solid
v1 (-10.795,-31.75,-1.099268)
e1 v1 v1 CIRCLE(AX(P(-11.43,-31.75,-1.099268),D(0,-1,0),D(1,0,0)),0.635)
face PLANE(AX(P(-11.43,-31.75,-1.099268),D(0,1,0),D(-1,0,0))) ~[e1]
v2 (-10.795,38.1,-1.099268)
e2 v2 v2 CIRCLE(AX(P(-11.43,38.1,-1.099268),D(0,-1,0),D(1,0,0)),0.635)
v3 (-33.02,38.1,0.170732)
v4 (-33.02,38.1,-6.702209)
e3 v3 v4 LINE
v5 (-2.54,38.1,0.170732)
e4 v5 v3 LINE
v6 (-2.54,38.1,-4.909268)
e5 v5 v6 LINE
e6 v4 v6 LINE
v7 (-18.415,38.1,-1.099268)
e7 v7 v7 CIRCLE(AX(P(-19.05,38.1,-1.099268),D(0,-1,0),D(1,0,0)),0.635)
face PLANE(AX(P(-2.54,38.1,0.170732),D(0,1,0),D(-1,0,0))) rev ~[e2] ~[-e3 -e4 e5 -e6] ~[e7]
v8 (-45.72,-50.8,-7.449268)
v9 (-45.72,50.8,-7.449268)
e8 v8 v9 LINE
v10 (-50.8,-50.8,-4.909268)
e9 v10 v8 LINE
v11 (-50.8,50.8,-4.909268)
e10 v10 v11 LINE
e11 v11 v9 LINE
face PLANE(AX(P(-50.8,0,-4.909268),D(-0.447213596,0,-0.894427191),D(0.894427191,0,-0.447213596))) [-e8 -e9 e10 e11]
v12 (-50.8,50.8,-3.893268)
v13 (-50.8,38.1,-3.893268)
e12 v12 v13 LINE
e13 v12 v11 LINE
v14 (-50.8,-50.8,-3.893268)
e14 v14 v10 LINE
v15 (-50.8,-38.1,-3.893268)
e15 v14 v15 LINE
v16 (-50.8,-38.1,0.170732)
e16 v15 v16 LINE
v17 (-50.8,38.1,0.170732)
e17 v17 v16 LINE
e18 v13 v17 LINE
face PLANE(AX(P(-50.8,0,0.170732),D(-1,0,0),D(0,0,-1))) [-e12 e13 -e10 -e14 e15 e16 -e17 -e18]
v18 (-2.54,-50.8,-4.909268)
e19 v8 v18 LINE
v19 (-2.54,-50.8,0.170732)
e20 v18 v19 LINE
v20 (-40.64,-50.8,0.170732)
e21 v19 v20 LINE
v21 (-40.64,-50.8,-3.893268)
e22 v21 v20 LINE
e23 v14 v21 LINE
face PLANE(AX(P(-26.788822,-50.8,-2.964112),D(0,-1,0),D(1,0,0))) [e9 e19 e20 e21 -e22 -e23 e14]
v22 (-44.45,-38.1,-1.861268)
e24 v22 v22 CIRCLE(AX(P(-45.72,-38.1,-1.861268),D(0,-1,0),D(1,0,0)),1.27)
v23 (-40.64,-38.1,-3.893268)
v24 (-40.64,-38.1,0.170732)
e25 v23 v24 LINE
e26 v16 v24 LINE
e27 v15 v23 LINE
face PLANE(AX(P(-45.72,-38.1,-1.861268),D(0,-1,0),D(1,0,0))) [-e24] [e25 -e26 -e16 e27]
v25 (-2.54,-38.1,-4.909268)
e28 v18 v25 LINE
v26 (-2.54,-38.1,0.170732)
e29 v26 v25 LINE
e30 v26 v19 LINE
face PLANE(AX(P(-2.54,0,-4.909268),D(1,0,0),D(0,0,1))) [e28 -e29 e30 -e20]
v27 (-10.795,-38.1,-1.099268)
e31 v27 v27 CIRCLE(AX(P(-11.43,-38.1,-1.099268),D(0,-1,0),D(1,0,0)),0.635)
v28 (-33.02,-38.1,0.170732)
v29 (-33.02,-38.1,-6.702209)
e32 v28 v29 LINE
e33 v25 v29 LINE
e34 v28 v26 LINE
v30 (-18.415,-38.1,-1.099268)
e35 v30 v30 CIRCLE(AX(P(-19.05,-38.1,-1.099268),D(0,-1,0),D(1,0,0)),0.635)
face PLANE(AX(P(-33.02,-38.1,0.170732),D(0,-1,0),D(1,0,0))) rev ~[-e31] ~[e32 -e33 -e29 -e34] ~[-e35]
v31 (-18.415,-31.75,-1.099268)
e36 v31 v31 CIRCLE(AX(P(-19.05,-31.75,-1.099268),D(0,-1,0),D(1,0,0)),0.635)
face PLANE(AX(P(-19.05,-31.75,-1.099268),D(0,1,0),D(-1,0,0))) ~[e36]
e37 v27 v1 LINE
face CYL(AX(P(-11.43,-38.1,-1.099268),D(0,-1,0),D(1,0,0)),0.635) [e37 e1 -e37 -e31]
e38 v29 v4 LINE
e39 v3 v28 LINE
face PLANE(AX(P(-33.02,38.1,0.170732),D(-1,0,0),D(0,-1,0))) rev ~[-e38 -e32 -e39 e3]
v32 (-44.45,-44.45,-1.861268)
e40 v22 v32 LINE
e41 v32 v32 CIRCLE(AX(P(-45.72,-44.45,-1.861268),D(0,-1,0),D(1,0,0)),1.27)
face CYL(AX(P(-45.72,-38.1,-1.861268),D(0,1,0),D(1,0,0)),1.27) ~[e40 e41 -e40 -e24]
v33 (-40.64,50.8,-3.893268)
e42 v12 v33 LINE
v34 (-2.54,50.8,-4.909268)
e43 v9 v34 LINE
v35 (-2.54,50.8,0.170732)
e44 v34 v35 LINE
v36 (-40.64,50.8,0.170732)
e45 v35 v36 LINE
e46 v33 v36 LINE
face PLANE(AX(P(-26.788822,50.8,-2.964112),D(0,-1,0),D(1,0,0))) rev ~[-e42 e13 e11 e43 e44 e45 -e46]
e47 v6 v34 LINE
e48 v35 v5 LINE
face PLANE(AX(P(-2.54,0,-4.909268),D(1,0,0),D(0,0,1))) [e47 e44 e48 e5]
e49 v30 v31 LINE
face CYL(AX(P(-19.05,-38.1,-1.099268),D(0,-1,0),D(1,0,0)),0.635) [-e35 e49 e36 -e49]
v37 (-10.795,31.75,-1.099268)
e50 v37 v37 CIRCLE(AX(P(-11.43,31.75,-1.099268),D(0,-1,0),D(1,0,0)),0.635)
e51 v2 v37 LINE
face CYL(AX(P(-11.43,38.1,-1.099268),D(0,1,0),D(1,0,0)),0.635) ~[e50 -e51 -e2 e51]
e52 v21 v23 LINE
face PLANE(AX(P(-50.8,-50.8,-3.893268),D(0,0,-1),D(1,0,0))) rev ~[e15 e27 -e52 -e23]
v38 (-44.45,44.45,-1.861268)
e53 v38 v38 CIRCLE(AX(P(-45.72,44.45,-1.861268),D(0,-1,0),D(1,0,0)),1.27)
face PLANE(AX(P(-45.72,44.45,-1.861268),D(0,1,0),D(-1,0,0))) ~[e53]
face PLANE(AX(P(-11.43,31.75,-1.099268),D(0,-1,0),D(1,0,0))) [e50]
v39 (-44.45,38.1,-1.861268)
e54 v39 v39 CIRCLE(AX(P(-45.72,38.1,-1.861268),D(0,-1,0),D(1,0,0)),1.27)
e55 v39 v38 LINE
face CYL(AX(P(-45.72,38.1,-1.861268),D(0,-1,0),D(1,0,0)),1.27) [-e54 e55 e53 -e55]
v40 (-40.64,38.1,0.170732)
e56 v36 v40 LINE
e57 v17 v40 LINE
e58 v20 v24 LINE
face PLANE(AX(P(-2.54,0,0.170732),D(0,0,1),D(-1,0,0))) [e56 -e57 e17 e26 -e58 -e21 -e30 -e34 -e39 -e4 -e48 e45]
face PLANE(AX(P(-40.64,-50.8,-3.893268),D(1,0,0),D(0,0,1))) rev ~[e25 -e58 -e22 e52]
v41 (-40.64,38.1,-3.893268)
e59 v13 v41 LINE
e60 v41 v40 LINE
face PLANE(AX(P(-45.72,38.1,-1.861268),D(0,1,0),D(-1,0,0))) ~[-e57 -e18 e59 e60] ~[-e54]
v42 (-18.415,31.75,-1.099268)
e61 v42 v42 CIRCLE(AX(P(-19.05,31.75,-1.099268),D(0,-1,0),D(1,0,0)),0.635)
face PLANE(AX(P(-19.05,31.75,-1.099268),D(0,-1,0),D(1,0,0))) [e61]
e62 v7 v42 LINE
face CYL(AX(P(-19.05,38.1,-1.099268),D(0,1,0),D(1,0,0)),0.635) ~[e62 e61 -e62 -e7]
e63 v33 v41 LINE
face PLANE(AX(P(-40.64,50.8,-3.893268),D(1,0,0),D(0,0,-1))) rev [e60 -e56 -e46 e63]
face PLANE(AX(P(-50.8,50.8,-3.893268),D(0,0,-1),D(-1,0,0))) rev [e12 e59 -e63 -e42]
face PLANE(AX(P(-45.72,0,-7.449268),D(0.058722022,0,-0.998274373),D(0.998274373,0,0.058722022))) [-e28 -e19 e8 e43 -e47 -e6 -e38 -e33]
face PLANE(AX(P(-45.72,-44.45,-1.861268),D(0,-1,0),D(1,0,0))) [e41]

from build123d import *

# Parameters (mm, degrees)
F1_DEPTH = 50.8
F3_DEPTH = 7.621
F4_W     = 10.16
F4_H     = 4.064
F5_DEPTH = 12.7
F6_R     = 1.27
F7_DEPTH = 6.35
F8_R     = 0.635
F9_DEPTH = 6.35


# Not quite as in the source:
# - a pattern or mirror of a feature is missing from the dataset's text; its kind, count and spacing are read off the source's solid


with BuildPart() as f1:
    # F0 (on Front) → F1 (new body, symmetric)
    with BuildSketch(Plane.XZ):
        Polygon((-2.54, -4.9092677324), (-2.54, 0.1707322676), (-50.8, 0.1707322676), (-50.8, -4.9092677324), (-45.72, -7.4492677324), align=None)
    extrude(amount=F1_DEPTH, both=True)

    # F2 (on face) → F3 (cut, through all)
    with BuildSketch(Plane.XY.offset(0.1707322676)):
        Polygon((-2.54, 0), (-2.54, 38.1), (-33.02, 38.1), (-33.02, 0), (-33.02, -38.1), (-2.54, -38.1), align=None)
    extrude(amount=-F3_DEPTH, mode=Mode.SUBTRACT)

    # F4 (on face) → F5 (cut)
    with BuildSketch(Plane.XZ.offset(50.8)):
        with Locations((-45.72, -1.8612677324)):
            Rectangle(F4_W, F4_H)
    f5 = extrude(amount=-F5_DEPTH, mode=Mode.SUBTRACT)

    # F5_copies: F5 across plane
    add(f5.mirror(Plane.ZX), mode=Mode.SUBTRACT)

    # F6 (on face) → F7 (join)
    with BuildSketch(Plane.XZ.offset(38.1)):
        with Locations((-45.72, -1.8612677324)):
            Circle(F6_R)
    f7 = extrude(amount=F7_DEPTH)

    # F7_copies: F7 across plane
    add(f7.mirror(Plane.ZX))

    # F8 (on face) → F9 (join)
    with BuildSketch(Plane.XZ.offset(-38.1)):
        with Locations((-19.05, -1.0992677324)):
            Circle(F8_R)
        with Locations((-11.43, -1.0992677324)):
            Circle(F8_R)
    f9 = extrude(amount=F9_DEPTH)

    # F9_copies: F9 across plane
    add(f9.mirror(Plane(origin=(0, 0, 0), x_dir=(0, 0, -1), z_dir=(0, -1, 0))))


solid = f1.part
